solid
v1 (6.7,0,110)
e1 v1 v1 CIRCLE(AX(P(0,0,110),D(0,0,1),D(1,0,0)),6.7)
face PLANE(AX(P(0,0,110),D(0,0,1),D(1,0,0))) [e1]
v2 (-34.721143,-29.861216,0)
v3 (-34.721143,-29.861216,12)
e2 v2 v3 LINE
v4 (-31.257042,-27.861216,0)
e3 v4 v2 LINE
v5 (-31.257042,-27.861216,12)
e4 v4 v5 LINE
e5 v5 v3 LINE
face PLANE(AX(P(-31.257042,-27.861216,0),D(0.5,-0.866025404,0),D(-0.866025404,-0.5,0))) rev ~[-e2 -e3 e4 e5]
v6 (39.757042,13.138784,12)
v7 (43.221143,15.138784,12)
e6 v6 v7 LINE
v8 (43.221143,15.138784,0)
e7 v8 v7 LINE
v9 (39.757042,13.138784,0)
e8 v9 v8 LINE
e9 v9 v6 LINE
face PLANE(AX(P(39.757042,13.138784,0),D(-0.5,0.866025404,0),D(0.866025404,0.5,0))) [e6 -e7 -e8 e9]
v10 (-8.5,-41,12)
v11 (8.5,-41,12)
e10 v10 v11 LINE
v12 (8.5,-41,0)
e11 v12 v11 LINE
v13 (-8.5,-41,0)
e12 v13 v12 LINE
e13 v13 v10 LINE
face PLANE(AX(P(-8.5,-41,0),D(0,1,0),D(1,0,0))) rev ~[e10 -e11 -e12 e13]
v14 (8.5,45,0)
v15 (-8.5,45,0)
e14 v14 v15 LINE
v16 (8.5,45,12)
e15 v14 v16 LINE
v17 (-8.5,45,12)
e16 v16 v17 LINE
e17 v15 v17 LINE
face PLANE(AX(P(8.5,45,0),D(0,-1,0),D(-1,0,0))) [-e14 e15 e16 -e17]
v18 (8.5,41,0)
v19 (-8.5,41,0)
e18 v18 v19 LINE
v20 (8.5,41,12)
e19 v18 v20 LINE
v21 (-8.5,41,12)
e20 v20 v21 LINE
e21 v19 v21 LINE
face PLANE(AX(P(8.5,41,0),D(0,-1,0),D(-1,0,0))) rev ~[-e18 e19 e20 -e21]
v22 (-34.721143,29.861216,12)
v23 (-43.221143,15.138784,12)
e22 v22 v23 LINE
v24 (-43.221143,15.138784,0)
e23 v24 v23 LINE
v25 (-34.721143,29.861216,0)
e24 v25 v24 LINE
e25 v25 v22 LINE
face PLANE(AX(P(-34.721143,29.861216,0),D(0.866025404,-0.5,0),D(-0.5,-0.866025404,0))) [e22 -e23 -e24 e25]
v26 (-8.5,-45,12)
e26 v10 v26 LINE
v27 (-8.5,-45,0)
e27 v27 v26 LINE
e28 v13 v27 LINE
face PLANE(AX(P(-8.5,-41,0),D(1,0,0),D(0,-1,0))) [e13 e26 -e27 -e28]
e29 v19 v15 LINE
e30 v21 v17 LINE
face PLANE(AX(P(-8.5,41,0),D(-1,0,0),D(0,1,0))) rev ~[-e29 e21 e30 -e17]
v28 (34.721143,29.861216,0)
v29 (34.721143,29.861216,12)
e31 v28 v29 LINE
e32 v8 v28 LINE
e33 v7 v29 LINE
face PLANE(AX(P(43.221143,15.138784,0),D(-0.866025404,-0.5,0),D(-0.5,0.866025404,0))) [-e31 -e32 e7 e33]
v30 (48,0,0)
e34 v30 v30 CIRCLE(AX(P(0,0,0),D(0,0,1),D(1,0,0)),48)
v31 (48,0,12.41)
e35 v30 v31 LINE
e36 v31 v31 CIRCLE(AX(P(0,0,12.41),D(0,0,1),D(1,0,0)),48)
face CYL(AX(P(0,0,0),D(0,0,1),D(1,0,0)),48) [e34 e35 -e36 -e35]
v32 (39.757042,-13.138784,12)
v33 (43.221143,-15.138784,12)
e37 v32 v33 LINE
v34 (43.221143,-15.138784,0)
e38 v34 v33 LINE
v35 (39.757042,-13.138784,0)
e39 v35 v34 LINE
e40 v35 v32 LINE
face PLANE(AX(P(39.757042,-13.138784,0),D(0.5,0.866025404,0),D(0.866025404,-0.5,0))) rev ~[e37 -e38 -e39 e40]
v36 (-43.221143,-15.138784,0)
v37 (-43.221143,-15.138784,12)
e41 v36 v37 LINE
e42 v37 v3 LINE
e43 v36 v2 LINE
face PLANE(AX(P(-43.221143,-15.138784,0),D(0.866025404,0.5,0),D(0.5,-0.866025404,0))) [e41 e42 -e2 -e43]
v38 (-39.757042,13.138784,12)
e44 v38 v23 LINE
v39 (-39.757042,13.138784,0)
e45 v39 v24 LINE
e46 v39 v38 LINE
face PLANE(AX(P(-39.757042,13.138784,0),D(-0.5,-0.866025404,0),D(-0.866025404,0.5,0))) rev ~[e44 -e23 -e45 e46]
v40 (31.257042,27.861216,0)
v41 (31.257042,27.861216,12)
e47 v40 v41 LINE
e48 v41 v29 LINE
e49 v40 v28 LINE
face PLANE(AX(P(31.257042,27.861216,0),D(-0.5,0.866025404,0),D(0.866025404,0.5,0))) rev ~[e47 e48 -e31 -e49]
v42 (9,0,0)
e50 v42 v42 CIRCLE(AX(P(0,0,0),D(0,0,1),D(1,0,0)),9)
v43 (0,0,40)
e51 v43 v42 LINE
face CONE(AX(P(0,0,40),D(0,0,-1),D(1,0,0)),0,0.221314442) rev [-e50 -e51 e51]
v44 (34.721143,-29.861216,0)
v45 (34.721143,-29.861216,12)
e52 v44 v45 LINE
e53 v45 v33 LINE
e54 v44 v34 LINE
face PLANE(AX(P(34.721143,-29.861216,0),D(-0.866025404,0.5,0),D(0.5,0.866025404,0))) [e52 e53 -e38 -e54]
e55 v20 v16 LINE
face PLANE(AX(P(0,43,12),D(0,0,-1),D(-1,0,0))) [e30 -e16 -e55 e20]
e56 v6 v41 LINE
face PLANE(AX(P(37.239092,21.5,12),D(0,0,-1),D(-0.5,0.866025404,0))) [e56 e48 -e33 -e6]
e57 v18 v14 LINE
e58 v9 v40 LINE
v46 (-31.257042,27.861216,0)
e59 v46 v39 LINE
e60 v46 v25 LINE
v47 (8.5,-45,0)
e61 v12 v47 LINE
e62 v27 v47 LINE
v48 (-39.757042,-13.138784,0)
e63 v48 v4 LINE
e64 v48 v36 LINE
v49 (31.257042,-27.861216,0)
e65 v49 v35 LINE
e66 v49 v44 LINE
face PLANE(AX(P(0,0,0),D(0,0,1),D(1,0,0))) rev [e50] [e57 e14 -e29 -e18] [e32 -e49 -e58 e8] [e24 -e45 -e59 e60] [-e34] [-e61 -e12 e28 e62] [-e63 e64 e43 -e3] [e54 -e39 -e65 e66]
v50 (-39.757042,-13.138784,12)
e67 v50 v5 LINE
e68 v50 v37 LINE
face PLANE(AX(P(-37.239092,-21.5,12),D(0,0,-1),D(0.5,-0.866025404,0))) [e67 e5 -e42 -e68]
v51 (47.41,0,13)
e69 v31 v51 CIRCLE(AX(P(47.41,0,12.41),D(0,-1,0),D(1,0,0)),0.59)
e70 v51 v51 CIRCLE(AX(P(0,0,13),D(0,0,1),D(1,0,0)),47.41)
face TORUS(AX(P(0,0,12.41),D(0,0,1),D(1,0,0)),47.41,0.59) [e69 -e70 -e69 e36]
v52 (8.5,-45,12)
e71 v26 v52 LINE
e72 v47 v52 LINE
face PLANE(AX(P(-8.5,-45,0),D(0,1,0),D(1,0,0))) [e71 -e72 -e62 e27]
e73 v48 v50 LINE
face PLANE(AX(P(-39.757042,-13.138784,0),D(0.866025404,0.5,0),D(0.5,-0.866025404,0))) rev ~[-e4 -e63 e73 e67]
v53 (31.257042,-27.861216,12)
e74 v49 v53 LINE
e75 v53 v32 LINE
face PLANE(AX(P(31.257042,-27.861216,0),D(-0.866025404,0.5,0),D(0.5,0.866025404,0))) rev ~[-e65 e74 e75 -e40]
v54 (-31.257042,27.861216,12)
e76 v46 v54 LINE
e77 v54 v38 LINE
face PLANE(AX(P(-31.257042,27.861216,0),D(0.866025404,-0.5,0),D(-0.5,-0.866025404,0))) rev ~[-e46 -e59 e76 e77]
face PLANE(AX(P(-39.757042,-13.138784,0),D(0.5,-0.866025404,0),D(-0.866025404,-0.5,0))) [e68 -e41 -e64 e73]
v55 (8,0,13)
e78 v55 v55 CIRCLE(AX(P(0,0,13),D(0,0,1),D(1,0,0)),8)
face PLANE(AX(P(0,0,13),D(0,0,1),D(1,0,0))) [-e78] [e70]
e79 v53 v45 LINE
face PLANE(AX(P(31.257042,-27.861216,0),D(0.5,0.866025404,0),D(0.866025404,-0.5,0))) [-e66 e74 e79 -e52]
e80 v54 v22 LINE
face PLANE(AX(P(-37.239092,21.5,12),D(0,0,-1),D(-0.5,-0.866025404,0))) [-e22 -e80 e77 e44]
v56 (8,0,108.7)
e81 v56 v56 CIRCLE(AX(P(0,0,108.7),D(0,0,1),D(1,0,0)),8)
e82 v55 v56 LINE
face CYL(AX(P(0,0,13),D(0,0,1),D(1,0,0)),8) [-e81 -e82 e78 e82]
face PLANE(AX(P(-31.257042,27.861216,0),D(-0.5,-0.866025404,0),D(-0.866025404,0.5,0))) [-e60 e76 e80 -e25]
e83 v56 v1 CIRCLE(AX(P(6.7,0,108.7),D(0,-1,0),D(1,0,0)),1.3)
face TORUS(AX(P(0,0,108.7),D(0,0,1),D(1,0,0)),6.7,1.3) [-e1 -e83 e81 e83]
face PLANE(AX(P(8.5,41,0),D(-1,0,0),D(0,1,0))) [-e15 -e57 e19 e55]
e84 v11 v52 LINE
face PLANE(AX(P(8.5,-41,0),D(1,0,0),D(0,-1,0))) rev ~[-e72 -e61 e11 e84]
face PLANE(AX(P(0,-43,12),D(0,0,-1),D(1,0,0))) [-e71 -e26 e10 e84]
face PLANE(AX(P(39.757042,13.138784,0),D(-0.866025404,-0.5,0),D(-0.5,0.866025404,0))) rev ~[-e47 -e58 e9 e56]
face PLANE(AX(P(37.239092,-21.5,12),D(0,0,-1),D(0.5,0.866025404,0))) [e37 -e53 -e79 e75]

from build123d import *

# Parameters (mm, degrees)
F2_W            = 17
F2_H            = 4
F3_DEPTH        = 12
F3_COPIES_COUNT = 6
F4_R            = 0.59
F5_R            = 1.3


# Not quite as in the source:
# - a pattern or mirror of a feature is missing from the dataset's text; its kind, count and spacing are read off the source's solid


with BuildPart() as f1:
    # F0 (on Front) → F1 (revolve)
    with BuildSketch(Plane.XZ):
        Polygon((0, 110), (0, 40), (9, 0), (48, 0), (48, 13), (8, 13), (8, 110), align=None)
    revolve(axis=Axis((0, 0, 75), (0, 0, 1)))

    # F2 (on face) → F3 (cut)
    with BuildSketch(Plane(origin=(0, 0, 0), x_dir=(1, 0, 0), z_dir=(0, 0, -1))):
        with Locations((0, 43)):
            Rectangle(F2_W, F2_H)
    f3 = extrude(amount=-F3_DEPTH, mode=Mode.SUBTRACT)

    # F3_copies: F3 ×6 about axis
    f3_copies_axis = Axis((0, 0, 0), (0, 0, 1))
    for i in range(1, F3_COPIES_COUNT):
        add(f3.rotate(f3_copies_axis, i * 360 / F3_COPIES_COUNT), mode=Mode.SUBTRACT)

    # F4
    f4_edges = [f1.edges().sort_by_distance(p)[0] for p in [
        (-48, 0, 13),
    ]]
    fillet(f4_edges, radius=F4_R)

    # F5
    f5_edges = [f1.edges().sort_by_distance(p)[0] for p in [
        (-8, 0, 110),
    ]]
    fillet(f5_edges, radius=F5_R)


solid = f1.part
